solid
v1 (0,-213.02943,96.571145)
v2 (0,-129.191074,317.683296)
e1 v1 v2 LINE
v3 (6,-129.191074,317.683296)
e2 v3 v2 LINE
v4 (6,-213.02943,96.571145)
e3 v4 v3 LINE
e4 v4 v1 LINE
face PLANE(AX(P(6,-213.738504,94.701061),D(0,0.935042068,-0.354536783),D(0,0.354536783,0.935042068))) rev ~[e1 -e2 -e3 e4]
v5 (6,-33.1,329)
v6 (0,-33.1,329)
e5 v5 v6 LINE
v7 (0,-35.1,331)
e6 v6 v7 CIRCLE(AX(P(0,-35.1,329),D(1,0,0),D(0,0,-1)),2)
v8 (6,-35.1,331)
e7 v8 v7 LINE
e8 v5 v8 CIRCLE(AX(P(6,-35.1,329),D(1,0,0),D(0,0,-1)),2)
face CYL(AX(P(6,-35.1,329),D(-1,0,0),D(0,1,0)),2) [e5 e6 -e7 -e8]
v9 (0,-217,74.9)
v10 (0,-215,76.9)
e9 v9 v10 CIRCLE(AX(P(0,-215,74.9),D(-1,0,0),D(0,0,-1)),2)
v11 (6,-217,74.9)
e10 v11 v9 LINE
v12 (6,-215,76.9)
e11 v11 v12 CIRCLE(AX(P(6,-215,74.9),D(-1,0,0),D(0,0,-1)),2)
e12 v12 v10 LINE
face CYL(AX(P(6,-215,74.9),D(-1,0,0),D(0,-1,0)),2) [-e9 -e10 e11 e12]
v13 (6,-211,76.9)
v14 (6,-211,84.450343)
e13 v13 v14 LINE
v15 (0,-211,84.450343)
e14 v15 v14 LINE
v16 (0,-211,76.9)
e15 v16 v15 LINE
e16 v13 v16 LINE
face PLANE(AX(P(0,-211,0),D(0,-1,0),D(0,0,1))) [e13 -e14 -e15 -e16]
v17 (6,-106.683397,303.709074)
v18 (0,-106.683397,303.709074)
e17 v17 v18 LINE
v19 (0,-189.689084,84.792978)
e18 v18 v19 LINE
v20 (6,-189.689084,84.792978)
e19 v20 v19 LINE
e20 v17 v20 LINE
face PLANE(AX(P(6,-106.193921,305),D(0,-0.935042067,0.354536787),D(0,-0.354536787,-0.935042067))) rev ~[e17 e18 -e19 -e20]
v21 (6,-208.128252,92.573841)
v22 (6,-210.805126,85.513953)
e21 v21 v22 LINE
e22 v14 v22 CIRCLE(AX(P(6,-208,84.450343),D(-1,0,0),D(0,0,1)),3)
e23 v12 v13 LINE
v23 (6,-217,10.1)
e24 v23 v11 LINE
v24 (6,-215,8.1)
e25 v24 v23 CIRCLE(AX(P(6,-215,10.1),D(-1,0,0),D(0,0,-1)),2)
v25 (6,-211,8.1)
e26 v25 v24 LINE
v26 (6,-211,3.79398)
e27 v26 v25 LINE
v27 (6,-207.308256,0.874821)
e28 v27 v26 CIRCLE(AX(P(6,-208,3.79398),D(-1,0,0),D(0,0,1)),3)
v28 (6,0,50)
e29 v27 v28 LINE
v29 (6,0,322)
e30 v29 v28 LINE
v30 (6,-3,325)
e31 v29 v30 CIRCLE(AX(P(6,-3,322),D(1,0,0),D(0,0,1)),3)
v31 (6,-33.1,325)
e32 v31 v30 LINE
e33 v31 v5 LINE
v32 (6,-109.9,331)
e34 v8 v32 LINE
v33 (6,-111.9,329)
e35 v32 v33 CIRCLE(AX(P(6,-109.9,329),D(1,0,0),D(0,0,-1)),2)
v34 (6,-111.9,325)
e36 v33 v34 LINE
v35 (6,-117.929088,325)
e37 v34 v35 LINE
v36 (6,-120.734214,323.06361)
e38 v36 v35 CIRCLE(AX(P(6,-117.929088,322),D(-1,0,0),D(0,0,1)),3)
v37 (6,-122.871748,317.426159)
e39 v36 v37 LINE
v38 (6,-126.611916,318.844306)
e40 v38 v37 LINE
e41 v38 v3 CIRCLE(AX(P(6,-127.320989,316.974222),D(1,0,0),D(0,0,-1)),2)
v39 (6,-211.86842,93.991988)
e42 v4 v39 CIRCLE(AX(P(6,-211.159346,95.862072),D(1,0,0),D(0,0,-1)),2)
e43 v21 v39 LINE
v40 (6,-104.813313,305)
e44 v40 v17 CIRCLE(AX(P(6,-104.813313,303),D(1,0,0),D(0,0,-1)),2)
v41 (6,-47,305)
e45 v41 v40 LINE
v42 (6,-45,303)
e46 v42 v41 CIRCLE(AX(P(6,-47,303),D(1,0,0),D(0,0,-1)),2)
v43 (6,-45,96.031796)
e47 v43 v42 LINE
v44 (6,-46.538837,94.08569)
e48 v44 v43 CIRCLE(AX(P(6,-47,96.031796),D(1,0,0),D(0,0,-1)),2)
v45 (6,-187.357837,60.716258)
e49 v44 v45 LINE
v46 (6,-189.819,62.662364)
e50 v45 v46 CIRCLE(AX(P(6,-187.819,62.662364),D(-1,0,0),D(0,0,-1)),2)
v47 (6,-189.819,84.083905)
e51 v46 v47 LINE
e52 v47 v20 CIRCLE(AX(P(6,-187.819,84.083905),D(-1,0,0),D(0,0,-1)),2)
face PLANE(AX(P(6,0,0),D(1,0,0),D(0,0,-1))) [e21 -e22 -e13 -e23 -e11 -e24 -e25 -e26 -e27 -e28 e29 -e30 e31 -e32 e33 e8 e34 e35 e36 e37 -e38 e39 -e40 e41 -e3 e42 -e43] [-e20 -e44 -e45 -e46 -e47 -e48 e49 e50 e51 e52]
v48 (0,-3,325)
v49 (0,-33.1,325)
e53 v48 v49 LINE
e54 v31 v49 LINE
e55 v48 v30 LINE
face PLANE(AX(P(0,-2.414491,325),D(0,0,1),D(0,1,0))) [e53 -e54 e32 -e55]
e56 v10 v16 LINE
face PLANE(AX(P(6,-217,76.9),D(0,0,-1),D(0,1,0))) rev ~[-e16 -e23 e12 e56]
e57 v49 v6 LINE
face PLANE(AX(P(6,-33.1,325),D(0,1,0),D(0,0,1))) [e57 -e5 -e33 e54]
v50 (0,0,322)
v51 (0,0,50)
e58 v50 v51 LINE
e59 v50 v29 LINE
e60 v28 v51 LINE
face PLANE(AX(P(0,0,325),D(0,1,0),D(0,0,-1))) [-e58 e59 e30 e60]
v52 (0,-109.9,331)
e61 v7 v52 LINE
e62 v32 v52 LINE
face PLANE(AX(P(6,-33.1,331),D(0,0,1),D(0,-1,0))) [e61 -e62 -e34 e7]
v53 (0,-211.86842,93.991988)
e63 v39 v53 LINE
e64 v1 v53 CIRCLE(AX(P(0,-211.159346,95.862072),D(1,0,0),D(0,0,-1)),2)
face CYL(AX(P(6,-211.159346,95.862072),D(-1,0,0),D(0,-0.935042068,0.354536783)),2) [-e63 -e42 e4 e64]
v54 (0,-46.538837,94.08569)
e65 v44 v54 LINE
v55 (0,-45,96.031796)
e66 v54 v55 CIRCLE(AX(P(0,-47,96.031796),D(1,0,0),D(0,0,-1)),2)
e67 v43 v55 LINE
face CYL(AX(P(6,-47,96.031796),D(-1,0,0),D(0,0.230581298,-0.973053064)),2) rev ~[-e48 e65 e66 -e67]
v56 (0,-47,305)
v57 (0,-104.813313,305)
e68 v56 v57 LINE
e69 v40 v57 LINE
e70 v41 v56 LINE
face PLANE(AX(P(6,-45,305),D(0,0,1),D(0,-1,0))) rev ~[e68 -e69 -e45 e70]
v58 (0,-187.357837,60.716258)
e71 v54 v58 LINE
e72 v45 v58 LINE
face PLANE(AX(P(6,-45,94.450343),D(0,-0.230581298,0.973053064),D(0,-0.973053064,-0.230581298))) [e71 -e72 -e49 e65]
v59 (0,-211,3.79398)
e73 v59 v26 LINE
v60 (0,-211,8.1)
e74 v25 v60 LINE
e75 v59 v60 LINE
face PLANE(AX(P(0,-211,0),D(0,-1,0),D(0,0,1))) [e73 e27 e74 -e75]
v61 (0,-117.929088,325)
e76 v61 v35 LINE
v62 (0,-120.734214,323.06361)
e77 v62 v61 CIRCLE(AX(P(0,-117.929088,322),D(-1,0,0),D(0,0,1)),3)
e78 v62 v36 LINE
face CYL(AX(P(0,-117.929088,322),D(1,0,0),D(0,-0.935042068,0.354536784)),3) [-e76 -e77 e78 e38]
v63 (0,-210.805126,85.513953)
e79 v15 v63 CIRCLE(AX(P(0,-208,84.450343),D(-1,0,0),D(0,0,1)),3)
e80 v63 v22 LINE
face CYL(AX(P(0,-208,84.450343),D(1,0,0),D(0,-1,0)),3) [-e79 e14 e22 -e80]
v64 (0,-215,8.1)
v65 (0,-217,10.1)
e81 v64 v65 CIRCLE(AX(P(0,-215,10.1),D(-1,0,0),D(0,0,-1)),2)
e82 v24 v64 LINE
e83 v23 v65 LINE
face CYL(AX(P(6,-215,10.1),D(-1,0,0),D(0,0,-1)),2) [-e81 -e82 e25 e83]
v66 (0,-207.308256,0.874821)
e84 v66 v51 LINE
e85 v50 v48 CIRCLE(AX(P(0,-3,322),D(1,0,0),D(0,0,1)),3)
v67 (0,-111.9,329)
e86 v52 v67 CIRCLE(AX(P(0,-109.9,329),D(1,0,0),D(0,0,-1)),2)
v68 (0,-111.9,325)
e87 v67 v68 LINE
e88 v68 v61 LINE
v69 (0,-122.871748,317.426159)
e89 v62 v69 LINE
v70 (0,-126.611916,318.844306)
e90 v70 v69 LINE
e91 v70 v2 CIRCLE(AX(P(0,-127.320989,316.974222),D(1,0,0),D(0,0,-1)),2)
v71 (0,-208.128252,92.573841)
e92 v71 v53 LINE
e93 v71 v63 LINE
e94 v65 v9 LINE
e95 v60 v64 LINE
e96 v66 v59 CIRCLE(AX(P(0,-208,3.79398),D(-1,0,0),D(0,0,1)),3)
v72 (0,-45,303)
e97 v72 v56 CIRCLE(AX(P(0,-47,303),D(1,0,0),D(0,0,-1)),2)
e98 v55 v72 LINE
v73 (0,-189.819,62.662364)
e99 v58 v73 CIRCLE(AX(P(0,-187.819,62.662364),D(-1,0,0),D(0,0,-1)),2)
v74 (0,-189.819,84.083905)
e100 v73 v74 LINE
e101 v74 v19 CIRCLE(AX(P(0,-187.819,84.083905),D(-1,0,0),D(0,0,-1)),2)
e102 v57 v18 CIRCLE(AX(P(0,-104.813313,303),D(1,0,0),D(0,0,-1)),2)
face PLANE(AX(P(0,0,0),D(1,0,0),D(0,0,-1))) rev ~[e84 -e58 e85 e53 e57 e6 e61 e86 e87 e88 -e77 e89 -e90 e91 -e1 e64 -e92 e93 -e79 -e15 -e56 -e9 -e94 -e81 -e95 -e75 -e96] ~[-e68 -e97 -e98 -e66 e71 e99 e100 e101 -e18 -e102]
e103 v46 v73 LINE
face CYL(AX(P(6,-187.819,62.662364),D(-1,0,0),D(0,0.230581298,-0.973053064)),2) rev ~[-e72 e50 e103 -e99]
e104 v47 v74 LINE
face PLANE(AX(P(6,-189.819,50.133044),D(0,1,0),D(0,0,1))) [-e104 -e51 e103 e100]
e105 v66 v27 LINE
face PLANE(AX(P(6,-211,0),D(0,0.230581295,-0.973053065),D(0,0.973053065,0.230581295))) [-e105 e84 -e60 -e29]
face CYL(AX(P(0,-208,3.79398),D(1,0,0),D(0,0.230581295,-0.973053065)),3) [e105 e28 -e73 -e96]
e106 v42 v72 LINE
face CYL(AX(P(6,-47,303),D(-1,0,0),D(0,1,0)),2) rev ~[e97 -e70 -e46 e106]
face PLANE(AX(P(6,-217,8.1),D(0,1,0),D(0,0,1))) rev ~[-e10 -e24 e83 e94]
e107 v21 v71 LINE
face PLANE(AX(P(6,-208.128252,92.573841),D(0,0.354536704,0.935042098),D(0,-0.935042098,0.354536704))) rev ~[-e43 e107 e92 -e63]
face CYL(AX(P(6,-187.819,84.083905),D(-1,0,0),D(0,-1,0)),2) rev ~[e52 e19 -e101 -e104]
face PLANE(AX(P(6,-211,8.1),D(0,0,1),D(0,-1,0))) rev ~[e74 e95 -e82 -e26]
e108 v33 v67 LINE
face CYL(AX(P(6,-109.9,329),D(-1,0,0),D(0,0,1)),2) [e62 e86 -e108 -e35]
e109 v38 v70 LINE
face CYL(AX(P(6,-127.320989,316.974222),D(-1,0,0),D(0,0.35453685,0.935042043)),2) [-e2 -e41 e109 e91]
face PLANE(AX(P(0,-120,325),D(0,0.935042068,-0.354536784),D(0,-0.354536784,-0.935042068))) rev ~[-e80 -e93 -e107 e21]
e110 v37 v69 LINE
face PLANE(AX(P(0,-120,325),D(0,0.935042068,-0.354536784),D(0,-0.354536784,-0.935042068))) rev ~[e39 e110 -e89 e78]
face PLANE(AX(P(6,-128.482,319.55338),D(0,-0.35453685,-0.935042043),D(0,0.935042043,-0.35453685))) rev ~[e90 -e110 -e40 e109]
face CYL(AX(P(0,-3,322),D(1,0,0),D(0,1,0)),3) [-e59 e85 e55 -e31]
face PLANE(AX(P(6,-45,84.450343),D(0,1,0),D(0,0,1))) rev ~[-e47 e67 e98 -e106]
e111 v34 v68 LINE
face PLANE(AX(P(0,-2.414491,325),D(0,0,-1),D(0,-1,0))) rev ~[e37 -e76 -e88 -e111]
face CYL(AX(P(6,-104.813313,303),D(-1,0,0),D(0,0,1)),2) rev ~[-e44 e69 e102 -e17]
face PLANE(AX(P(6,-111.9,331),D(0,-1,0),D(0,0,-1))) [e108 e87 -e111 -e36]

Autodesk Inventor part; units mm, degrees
ref_plane "YZ Plane" through (0, 0, 0) normal (1, 0, 0) x (0, 1, 0)
ref_plane "XZ Plane" through (0, 0, 0) normal (0, 1, 0) x (-1, 0, 0)
ref_plane "XY Plane" through (0, 0, 0) normal (0, 0, 1) x (1, 0, 0)
sketch "Sketch1" plane through (0, 0, 0) normal (1, 0, 0) x (0, 1, 0)
  line L0 (0, 325) -> (0, 0)
  line L1 (0, 0) -> (-211, 0)
  line L2 (-211, 0) -> (-211, 85)
  line L3 (-2.414491, 325) -> (0, 325)
  line L4 (0, 325) -> (-120, 325)
  line L5 (-120, 325) -> (-211, 85)
  dimension "d0" = 325
  dimension "d1" = 211
  dimension "d2" = 85
  dimension "d3" = 120
  dimension "d33" = 240
  dimension "d34" = 91
extrude "Extrusion1" add sketch "Sketch1" along normal blind 6
sketch "Sketch2" plane through (6, 0, 0) normal (1, 0, 0) x (0, 0, -1)
  line L0 (-325, 0) -> (-325, -120) projected
  line L1 (-325, -33.1) -> (-331, -33.1)
  line L2 (-331, -33.1) -> (-331, -111.9)
  line L3 (-331, -111.9) -> (-325, -111.9)
  line L4 (-325, -111.9) -> (-325, -33.1)
  line L5 (-85, -211) -> (0, -211) projected
  line L6 (0, -211) -> (0, 0) projected
  line L7 (-76.9, -211) -> (-8.1, -211)
  line L8 (-8.1, -211) -> (-8.1, -217)
  line L9 (-8.1, -217) -> (-76.9, -217)
  line L10 (-76.9, -217) -> (-76.9, -211)
  line L11 (-325, -120) -> (-331, -111.9) construction
  line L12 (0, 0) -> (-325, 0) projected
  line L13 (-325, -25) -> (-331, -33.1) construction
  dimension "d6" = 6
  dimension "d12" = 6
  dimension "d13" = 8.1
  dimension "d38" = 25
  dimension "d47" = 8.1
  dimension "d48" = 8.1
extrude "Extrusion2" add sketch "Sketch2" against normal blind 6
sketch "Sketch3" plane through (6, 0, 0) normal (1, 0, 0) x (0, 0, -1)
  line L0 (-317.426159, -122.871748) -> (-92.573841, -208.128252)
  line L1 (-92.573841, -208.128252) -> (-94.701061, -213.738504)
  line L2 (-94.701061, -213.738504) -> (-319.55338, -128.482)
  line L3 (-319.55338, -128.482) -> (-317.426159, -122.871748)
  line L4 (-325, -120) -> (-85, -211)
  dimension "d17" = 8.1
  dimension "d35" = 6
  dimension "d36" = 8.1
extrude "Extrusion3" add sketch "Sketch3" against normal blind 6
sketch "Sketch6" plane through (6, 0, 0) normal (1, 0, 0) x (0, 0, -1)
  line L0 (0, 0) -> (-325, 0) projected
  line L1 (0, -211) -> (0, 0) projected
  line L2 (0, -211) -> (-50, 0)
  line L3 (-50, 0) -> (0, 0)
  line L4 (0, -211) -> (0, 0)
  dimension "d39" = 50
extrude "Extrusion6" cut sketch "Sketch6" against normal through all
fillet "Fillet2" radius 3 4 edges at (3, 0, 325) (3, -120, 325) (3, -211, 85) (3, -211, 0)
fillet "Fillet3" radius 2 6 edges at (3, -217, 8.1) (3, -217, 76.9) (3, -213.7385, 94.7011) (3, -128.482, 319.5534) (3, -111.9, 331) (3, -33.1, 331)
sketch "Sketch4" plane through (6, 0, 0) normal (1, 0, 0) x (0, 0, -1)
  line L0 (-323.06361, -120.734214) -> (-85.513953, -210.805126)
  line L1 (-323.06361, -120.734214) -> (-85.513953, -210.805126)
  line L2 (-50, 0) -> (-322, 0)
  line L3 (-325, -3) -> (-325, -33.1)
  line L4 (-325, -33.1) -> (-329, -33.1)
  line L5 (-305, -45) -> (-305, -106.193921)
  line L6 (-305, -106.193921) -> (-84.450343, -189.819)
  line L7 (-84.450343, -189.819) -> (-84.450343, -45)
  line L8 (-84.450343, -45) -> (-305, -45)
  arc A0 (-85.513953, -210.805126) -> (-84.450343, -211) centre (-84.450343, -208) ccw
  point P0 (-191.521346, -165.651434)
  point P1 (-106.085382, -201.605735)
  point P2 (-3, 0)
  point P3 (0, 0)
  dimension "d24" = 45
  dimension "d26" = 20
  dimension "d27" = 20
extrude "Extrusion4" cut sketch "Sketch4" against normal through all
sketch "Sketch7" plane through (6, 0, 0) normal (1, 0, 0) x (0, 0, -1)
  line L0 (-0.874821, -207.308256) -> (-50, 0)
  line L1 (-325, -33.1) -> (-329, -33.1)
  line L2 (-84.450343, -45) -> (-50.133044, -189.819)
  line L3 (-50.133044, -189.819) -> (-84.450343, -189.819)
  line L4 (-84.450343, -45) -> (-84.450343, -189.819)
  point P0 (0, 0)
extrude "Extrusion7" cut sketch "Sketch7" against normal through all
sketch "Sketch8" plane through (6, 0, 0) normal (1, 0, 0) x (0, 0, -1)
  line L0 (-84.450343, -45) -> (-50.133044, -189.819)
  line L1 (-305, -45) -> (-84.450343, -45)
  line L2 (-50.133044, -189.819) -> (-84.450343, -45)
  line L3 (-84.450343, -45) -> (-94.450343, -45)
  line L4 (-94.450343, -45) -> (-60.133044, -189.819)
  line L5 (-50.133044, -189.819) -> (-60.133044, -189.819)
  line L6 (-50.133044, -189.819) -> (-84.450343, -189.819)
  point P0 (0, 0)
  dimension "d44" = 10
extrude "Extrusion8" add sketch "Sketch8" against normal blind 6
fillet "Fillet4" radius 2 5 edges at (3, -189.819, 60.133) (3, -189.819, 84.4503) (3, -45, 94.4503) (3, -106.1939, 305) (3, -45, 305)
equation "\"d26\" = d27"
properties part number "TopSidePanel"
